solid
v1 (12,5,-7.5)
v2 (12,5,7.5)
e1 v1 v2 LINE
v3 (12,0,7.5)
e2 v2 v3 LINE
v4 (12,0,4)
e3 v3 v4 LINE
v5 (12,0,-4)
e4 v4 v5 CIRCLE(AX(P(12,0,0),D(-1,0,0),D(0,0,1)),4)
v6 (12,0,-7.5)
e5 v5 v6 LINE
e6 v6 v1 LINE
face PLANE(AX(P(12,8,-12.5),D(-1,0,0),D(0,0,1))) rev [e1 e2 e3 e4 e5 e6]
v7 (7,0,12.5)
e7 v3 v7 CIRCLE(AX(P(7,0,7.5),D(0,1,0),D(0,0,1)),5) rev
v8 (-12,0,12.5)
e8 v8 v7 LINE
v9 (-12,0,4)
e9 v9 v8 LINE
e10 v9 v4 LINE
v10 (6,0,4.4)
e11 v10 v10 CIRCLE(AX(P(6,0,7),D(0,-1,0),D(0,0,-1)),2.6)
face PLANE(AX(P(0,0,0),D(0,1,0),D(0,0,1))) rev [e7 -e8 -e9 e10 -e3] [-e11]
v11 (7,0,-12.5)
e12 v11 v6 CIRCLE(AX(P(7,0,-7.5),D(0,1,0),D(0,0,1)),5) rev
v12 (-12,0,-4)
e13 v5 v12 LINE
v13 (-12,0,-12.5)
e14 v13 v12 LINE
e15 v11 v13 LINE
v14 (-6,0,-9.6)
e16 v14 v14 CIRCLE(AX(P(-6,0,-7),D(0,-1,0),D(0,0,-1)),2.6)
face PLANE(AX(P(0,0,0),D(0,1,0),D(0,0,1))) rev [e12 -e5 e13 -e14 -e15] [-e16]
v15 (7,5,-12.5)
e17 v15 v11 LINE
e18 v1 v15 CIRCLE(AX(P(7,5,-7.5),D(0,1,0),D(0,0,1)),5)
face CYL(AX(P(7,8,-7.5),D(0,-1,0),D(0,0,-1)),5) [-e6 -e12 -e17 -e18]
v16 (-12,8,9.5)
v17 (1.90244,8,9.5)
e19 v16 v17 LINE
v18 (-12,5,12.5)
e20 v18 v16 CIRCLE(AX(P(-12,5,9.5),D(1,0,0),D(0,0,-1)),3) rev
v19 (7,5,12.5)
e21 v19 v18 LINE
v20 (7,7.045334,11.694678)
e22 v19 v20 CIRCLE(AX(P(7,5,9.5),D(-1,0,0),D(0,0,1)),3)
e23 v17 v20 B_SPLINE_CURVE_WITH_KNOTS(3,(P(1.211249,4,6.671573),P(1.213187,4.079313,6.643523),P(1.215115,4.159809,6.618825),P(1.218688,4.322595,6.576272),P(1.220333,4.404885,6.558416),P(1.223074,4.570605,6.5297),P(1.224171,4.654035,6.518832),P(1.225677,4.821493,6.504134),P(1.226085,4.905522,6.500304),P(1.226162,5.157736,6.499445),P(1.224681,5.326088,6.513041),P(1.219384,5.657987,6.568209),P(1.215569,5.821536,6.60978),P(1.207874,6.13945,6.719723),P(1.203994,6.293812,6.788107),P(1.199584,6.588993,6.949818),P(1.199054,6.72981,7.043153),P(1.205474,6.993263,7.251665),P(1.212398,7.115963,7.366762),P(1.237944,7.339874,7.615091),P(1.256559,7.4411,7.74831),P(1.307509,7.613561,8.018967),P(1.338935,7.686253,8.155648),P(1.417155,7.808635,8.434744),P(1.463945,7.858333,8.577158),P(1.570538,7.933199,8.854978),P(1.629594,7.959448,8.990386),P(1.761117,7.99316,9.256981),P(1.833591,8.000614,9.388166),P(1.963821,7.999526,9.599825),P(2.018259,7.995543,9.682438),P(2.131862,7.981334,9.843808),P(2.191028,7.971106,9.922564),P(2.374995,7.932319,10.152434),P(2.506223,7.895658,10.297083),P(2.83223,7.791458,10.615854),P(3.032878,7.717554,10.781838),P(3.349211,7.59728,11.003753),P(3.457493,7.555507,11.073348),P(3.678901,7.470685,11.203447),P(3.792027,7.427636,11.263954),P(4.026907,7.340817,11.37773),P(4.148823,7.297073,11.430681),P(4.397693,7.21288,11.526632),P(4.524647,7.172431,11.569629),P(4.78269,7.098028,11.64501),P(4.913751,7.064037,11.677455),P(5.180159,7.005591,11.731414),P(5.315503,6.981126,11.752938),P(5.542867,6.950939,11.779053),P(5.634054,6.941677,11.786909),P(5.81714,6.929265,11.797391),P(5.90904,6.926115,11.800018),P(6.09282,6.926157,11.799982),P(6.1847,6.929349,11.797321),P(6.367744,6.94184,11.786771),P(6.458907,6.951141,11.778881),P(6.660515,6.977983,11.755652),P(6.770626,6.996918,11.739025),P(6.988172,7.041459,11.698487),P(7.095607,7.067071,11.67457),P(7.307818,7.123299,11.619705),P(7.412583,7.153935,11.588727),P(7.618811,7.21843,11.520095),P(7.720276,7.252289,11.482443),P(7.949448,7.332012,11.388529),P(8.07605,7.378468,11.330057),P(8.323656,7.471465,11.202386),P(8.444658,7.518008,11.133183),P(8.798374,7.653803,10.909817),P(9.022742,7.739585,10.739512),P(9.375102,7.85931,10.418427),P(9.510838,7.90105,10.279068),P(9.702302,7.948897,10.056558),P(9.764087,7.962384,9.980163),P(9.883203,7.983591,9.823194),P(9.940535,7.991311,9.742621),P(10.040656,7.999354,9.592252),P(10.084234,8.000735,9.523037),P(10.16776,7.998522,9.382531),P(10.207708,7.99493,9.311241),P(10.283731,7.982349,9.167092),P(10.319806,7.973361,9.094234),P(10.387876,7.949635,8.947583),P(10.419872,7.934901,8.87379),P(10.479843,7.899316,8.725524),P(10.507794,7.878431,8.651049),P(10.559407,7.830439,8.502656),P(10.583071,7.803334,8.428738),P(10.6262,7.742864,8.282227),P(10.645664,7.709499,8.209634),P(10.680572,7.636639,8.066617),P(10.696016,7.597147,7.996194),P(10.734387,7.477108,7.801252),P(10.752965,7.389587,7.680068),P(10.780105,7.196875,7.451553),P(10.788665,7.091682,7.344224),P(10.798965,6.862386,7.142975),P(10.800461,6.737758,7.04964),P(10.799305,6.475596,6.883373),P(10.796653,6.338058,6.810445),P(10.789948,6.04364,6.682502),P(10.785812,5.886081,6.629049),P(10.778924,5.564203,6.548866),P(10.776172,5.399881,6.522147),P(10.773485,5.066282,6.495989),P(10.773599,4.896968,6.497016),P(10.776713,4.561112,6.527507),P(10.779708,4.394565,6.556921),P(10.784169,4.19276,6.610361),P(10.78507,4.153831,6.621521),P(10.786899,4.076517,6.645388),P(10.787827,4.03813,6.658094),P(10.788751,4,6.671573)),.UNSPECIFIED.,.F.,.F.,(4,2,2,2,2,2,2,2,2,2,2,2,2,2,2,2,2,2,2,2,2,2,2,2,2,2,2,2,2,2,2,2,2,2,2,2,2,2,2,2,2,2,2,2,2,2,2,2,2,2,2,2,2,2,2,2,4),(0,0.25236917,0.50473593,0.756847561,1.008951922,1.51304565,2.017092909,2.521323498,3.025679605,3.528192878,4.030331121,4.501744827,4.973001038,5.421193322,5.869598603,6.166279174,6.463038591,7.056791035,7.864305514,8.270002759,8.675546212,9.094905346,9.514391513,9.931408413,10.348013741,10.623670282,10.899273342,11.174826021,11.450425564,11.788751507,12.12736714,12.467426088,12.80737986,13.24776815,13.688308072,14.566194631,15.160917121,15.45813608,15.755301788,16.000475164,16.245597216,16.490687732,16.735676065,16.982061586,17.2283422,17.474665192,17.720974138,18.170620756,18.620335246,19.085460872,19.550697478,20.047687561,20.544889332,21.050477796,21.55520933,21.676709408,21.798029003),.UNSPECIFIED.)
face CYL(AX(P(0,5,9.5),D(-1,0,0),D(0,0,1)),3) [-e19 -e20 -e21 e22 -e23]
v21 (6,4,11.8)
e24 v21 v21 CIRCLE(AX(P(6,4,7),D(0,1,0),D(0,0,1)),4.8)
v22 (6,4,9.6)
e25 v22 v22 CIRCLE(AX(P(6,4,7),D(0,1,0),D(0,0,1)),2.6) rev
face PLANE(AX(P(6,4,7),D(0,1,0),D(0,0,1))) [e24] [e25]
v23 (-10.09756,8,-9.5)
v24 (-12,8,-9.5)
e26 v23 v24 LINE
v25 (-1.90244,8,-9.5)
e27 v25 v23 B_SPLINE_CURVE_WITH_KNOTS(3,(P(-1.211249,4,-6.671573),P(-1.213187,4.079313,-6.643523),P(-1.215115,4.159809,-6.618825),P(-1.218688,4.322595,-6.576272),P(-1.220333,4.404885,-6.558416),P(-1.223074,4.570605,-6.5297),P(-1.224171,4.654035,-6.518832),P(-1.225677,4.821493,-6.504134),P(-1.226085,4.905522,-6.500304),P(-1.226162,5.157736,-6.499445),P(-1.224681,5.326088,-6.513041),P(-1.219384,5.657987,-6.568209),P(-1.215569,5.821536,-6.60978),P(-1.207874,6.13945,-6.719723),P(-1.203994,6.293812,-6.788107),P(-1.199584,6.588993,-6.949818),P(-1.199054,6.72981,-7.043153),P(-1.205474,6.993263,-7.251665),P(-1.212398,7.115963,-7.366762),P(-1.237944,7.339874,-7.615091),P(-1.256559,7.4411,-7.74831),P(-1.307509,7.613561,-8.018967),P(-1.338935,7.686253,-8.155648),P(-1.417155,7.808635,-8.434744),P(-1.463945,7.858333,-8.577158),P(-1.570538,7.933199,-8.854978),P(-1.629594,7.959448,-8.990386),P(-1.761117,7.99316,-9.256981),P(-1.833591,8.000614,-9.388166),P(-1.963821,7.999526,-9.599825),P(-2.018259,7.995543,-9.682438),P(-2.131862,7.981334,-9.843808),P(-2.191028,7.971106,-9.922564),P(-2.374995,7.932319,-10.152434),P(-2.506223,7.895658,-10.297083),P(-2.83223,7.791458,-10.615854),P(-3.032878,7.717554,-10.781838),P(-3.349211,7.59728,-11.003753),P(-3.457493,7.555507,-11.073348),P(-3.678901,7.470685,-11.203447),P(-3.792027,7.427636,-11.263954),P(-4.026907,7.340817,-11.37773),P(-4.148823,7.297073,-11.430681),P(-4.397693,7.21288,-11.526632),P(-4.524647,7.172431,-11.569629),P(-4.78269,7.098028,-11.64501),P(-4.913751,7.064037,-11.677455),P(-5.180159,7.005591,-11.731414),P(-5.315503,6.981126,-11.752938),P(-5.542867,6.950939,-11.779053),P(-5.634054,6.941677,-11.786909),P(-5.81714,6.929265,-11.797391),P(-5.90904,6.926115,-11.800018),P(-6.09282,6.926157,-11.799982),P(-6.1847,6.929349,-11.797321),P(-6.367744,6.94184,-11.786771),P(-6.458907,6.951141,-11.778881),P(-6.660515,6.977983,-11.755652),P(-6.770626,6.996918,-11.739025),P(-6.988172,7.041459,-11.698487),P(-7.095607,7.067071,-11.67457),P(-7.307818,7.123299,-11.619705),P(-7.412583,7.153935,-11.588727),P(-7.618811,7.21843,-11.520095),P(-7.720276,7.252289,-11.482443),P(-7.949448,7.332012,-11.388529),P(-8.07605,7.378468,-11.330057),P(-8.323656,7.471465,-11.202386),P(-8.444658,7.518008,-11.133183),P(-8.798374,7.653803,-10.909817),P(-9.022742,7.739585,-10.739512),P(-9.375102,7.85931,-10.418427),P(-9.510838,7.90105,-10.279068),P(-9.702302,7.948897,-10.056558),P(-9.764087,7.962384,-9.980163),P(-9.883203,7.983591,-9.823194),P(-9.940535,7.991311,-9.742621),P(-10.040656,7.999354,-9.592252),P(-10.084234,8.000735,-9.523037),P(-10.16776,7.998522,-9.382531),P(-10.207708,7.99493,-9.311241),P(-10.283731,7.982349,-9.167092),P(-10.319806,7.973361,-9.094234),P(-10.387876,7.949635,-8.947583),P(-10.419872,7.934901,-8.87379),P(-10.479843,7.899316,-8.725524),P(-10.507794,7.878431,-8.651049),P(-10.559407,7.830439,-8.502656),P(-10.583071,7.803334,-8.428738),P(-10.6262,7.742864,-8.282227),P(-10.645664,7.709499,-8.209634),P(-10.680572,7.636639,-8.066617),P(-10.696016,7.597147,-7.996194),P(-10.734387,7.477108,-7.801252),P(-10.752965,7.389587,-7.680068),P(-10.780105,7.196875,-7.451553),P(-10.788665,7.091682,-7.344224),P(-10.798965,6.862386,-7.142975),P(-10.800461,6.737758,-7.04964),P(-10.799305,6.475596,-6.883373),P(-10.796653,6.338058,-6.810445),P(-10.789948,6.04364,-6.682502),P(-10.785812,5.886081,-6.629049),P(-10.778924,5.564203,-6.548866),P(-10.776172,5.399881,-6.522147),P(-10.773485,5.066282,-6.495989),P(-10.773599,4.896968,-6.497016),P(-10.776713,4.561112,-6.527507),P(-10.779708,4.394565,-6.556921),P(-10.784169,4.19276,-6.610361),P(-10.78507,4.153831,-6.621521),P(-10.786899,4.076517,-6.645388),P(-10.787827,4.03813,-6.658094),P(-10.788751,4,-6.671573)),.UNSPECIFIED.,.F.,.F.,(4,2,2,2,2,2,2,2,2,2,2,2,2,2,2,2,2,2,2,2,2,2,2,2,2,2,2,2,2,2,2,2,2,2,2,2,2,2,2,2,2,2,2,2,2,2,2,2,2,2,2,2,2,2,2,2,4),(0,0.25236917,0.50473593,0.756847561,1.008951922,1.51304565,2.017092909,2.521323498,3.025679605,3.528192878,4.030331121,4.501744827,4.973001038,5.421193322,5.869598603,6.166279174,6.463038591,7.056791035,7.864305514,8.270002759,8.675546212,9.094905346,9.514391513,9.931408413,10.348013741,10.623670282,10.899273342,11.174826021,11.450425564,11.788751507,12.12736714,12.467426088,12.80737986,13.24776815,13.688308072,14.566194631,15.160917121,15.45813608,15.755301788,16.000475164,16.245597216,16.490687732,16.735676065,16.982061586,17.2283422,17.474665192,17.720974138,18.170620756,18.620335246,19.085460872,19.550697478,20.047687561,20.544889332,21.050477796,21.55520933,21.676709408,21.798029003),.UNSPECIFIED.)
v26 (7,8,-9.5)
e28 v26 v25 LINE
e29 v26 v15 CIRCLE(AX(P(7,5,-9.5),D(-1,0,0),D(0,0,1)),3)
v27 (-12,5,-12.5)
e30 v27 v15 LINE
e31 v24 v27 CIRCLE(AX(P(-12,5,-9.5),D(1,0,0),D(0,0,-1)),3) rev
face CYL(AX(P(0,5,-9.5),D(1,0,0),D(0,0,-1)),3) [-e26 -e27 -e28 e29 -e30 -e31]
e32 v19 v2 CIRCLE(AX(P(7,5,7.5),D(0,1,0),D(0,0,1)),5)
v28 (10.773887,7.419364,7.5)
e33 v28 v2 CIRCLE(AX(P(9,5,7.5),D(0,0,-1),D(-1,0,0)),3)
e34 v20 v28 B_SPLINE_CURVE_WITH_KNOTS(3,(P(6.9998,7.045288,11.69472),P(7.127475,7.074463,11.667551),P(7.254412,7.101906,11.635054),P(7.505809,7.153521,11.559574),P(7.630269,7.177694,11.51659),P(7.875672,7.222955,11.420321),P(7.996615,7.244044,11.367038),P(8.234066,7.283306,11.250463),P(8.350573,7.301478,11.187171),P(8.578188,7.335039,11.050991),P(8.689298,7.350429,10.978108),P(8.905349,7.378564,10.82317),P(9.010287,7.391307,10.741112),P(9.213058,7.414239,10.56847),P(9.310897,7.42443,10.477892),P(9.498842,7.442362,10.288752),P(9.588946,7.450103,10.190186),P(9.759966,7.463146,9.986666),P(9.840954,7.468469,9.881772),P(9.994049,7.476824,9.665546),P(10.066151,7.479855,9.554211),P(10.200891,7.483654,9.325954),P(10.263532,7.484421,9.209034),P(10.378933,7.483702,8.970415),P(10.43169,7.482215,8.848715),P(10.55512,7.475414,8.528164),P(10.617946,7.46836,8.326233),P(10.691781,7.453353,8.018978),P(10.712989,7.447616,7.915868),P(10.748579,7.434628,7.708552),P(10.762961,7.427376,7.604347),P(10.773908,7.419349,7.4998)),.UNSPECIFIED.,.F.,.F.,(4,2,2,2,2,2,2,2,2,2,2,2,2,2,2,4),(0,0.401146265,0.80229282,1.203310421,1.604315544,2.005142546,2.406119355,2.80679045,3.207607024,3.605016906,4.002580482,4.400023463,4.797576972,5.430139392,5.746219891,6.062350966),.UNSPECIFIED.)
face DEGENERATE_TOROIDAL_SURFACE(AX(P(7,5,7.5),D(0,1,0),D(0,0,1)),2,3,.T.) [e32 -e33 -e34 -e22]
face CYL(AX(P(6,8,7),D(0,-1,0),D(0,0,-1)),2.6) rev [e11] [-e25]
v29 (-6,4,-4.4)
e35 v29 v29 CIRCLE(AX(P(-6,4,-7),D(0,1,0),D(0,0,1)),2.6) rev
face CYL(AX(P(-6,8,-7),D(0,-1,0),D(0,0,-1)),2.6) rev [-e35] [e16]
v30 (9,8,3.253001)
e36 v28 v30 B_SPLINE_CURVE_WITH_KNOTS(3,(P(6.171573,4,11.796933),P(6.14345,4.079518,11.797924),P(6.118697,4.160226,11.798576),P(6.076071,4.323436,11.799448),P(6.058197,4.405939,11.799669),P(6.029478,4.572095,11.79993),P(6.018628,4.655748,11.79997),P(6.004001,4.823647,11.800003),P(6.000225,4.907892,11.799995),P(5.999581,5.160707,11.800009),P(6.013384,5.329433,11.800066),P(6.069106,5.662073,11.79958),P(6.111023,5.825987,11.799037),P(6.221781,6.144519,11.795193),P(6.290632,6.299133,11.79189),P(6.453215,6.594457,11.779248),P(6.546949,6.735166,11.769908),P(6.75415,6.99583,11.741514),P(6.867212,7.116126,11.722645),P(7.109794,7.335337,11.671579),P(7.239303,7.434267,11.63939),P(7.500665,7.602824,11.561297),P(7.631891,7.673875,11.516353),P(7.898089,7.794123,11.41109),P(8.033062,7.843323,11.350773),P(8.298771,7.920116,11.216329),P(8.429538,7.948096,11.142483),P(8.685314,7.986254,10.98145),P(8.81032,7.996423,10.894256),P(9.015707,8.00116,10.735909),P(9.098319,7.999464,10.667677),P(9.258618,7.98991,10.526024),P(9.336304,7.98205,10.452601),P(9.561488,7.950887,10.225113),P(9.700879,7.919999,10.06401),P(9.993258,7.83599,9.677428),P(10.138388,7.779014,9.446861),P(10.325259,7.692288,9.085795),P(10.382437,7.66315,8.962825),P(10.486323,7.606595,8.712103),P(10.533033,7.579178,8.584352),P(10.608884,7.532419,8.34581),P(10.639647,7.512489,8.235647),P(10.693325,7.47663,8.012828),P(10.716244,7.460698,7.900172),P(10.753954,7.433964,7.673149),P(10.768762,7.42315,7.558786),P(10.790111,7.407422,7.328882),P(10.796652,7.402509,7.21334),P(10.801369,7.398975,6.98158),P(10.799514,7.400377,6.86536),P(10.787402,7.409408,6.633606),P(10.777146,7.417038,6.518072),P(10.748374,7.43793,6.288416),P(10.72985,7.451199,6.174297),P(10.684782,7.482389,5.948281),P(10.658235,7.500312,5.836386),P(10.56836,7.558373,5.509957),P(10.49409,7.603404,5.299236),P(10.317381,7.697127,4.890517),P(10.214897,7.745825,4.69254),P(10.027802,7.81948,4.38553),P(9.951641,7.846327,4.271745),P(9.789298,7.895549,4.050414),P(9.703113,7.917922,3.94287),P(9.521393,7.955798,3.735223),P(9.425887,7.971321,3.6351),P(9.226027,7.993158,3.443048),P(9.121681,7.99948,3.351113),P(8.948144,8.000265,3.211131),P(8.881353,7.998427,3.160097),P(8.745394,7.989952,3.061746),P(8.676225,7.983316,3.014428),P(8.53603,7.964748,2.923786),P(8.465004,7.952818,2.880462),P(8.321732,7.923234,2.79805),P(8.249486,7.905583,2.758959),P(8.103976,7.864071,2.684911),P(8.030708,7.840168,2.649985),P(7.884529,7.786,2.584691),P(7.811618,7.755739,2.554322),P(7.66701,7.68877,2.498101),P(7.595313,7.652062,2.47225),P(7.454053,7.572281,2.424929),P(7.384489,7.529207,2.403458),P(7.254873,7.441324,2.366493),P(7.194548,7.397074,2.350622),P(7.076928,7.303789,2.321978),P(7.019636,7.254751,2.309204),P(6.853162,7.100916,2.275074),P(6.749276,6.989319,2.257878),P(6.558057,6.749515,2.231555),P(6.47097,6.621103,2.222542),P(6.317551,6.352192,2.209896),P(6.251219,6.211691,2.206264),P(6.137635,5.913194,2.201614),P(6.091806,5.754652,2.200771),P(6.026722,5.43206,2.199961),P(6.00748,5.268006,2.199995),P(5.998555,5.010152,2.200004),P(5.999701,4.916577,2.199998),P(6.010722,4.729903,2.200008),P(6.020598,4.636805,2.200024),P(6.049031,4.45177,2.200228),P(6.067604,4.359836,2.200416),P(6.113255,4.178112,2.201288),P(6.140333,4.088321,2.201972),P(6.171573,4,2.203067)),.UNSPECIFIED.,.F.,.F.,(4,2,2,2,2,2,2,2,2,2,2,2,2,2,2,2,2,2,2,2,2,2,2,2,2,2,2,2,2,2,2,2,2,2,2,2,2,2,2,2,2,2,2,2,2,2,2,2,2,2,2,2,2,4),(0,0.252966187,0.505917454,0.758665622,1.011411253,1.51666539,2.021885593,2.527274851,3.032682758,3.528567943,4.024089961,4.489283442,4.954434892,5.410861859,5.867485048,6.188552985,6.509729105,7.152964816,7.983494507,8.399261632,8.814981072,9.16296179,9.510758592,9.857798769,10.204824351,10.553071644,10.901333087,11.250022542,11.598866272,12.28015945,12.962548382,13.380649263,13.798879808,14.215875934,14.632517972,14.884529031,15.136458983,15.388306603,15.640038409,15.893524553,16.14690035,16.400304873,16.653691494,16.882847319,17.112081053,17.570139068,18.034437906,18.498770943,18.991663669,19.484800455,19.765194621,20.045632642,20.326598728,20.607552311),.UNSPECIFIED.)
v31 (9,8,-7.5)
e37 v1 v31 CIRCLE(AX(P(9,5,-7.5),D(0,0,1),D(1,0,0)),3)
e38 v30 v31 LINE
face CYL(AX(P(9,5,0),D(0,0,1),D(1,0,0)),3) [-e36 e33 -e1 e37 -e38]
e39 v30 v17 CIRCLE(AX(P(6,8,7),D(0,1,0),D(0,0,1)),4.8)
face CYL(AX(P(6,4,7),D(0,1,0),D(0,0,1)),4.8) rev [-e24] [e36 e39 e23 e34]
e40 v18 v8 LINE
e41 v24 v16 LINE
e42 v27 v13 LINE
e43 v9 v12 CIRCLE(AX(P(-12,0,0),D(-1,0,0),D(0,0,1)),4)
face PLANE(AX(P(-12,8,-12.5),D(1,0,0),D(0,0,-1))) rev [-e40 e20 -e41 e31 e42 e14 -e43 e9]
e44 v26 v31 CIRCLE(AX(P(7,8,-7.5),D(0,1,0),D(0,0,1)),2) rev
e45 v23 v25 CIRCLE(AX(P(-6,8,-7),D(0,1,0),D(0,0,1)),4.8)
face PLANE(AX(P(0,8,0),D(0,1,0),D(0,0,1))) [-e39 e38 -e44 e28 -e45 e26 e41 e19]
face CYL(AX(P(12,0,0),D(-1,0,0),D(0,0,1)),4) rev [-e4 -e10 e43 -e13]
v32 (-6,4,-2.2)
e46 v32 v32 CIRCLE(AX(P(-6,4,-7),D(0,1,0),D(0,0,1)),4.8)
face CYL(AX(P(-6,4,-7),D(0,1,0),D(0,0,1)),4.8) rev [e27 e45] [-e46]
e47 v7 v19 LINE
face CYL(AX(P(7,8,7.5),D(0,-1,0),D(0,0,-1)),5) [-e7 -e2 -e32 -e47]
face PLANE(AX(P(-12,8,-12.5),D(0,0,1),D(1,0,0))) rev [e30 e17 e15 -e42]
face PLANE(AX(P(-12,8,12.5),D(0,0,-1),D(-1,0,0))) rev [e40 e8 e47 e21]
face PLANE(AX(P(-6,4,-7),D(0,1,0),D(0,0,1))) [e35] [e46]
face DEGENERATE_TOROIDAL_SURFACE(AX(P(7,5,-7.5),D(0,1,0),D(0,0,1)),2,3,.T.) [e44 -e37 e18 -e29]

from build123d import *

# Parameters (mm, degrees)
SKETCH1_W           = 24
SKETCH1_H           = 25
BOSS_EXTRUDE1_DEPTH = 8
SKETCH2_R           = 4
CUT_EXTRUDE1_DEPTH  = 29.217902119
SKETCH3_R           = 2.6
CUT_EXTRUDE2_DEPTH  = 20.085334684
FILLET1_R           = 3
FILLET2_R           = 5
SKETCH4_R           = 4.8
CUT_EXTRUDE3_DEPTH  = 4


with BuildPart() as part:
    # Sketch1 → Boss-Extrude1 (new body)
    with BuildSketch(Plane(origin=(0, 0, 0), x_dir=(1, 0, 0), z_dir=(0, 1, 0))):
        Rectangle(SKETCH1_W, SKETCH1_H)
    extrude(amount=BOSS_EXTRUDE1_DEPTH)

    # Sketch2 → Cut-Extrude1 (cut, through all)
    with BuildSketch(Plane.ZY.offset(12)):
        Circle(SKETCH2_R)
    extrude(amount=-CUT_EXTRUDE1_DEPTH, mode=Mode.SUBTRACT)

    # Sketch3 → Cut-Extrude2 (cut, through all)
    with BuildSketch(Plane.XZ):
        with Locations(Location((-6, -7, 0), (0, 0, 270))):
            Circle(SKETCH3_R)
        with Locations(Location((6, 7, 0), (0, 0, 270))):
            Circle(SKETCH3_R)
    extrude(amount=-CUT_EXTRUDE2_DEPTH, mode=Mode.SUBTRACT)

    # Fillet1
    # the kernel refuses this fillet: 3 mm, written as the material it takes off along each edge
    with BuildSketch(Plane(origin=(19.5, 8, 12.5), x_dir=(0, 0, -1), z_dir=(-1, 0, 0))) as fillet1_piece_1:
        with BuildLine():
            CenterArc((FILLET1_R, FILLET1_R), FILLET1_R, 180, 90)
            Line((0, FILLET1_R), (0, 0))
            Line((0, 0), (FILLET1_R, 0))
        make_face()
    extrude(amount=39, mode=Mode.SUBTRACT)
    with BuildSketch(Plane(origin=(12, 8, -20), x_dir=(0, -1, 0), z_dir=(0, 0, 1))) as fillet1_piece_2:
        with BuildLine():
            CenterArc((FILLET1_R, -FILLET1_R), FILLET1_R, 90, 90)
            Line((0, -FILLET1_R), (0, 0))
            Line((0, 0), (FILLET1_R, 0))
        make_face()
    extrude(amount=40, mode=Mode.SUBTRACT)
    with BuildSketch(Plane(origin=(-19.5, 8, -12.5), x_dir=(0, -1, 0), z_dir=(1, 0, 0))) as fillet1_piece_3:
        with BuildLine():
            CenterArc((FILLET1_R, -FILLET1_R), FILLET1_R, 90, 90)
            Line((0, -FILLET1_R), (0, 0))
            Line((0, 0), (FILLET1_R, 0))
        make_face()
    extrude(amount=39, mode=Mode.SUBTRACT)

    # Fillet2
    # the kernel refuses this fillet: 5 mm, written as the material it takes off along each edge
    with BuildSketch(Plane(origin=(7, 8, 7.5), x_dir=(0, 0, 1), z_dir=(-1, 0, 0))) as fillet2_piece_1:
        with BuildLine():
            CenterArc((2, -3), 3, 0, 90)
            Line((5, -3), (5, 0))
            Line((5, 0), (2, 0))
        make_face()
    revolve(axis=Axis((7, 8, 7.5), (0, 1, 0)), revolution_arc=90, mode=Mode.SUBTRACT)
    with BuildSketch(Plane(origin=(7, 8, -7.5), x_dir=(1, 0, 0), z_dir=(0, 0, 1))) as fillet2_piece_2:
        with BuildLine():
            CenterArc((2, -3), 3, 0, 90)
            Line((5, -3), (5, 0))
            Line((5, 0), (2, 0))
        make_face()
    revolve(axis=Axis((7, 8, -7.5), (0, 1, 0)), revolution_arc=90, mode=Mode.SUBTRACT)
    with BuildSketch(Plane(origin=(12, -12.5, -12.5), x_dir=(-1, 0, 0), z_dir=(0, 1, 0)), Plane(origin=(12, -12.5, 12.5), x_dir=(0, 0, -1), z_dir=(0, 1, 0))) as fillet2_piece_3:
        with BuildLine():
            CenterArc((FILLET2_R, FILLET2_R), FILLET2_R, 180, 90)
            Line((0, FILLET2_R), (0, 0))
            Line((0, 0), (FILLET2_R, 0))
        make_face()
    extrude(amount=20.5, mode=Mode.SUBTRACT)

    # Sketch4 → Cut-Extrude3 (cut)
    with BuildSketch(Plane(origin=(0, 8, 0), x_dir=(1, 0, 0), z_dir=(0, 1, 0))):
        with Locations(Location((-6, 7, 0), (0, 0, 270))):
            Circle(SKETCH4_R)
        with Locations(Location((6, -7, 0), (0, 0, 270))):
            Circle(SKETCH4_R)
    extrude(amount=-CUT_EXTRUDE3_DEPTH, mode=Mode.SUBTRACT)


solid = part.part
